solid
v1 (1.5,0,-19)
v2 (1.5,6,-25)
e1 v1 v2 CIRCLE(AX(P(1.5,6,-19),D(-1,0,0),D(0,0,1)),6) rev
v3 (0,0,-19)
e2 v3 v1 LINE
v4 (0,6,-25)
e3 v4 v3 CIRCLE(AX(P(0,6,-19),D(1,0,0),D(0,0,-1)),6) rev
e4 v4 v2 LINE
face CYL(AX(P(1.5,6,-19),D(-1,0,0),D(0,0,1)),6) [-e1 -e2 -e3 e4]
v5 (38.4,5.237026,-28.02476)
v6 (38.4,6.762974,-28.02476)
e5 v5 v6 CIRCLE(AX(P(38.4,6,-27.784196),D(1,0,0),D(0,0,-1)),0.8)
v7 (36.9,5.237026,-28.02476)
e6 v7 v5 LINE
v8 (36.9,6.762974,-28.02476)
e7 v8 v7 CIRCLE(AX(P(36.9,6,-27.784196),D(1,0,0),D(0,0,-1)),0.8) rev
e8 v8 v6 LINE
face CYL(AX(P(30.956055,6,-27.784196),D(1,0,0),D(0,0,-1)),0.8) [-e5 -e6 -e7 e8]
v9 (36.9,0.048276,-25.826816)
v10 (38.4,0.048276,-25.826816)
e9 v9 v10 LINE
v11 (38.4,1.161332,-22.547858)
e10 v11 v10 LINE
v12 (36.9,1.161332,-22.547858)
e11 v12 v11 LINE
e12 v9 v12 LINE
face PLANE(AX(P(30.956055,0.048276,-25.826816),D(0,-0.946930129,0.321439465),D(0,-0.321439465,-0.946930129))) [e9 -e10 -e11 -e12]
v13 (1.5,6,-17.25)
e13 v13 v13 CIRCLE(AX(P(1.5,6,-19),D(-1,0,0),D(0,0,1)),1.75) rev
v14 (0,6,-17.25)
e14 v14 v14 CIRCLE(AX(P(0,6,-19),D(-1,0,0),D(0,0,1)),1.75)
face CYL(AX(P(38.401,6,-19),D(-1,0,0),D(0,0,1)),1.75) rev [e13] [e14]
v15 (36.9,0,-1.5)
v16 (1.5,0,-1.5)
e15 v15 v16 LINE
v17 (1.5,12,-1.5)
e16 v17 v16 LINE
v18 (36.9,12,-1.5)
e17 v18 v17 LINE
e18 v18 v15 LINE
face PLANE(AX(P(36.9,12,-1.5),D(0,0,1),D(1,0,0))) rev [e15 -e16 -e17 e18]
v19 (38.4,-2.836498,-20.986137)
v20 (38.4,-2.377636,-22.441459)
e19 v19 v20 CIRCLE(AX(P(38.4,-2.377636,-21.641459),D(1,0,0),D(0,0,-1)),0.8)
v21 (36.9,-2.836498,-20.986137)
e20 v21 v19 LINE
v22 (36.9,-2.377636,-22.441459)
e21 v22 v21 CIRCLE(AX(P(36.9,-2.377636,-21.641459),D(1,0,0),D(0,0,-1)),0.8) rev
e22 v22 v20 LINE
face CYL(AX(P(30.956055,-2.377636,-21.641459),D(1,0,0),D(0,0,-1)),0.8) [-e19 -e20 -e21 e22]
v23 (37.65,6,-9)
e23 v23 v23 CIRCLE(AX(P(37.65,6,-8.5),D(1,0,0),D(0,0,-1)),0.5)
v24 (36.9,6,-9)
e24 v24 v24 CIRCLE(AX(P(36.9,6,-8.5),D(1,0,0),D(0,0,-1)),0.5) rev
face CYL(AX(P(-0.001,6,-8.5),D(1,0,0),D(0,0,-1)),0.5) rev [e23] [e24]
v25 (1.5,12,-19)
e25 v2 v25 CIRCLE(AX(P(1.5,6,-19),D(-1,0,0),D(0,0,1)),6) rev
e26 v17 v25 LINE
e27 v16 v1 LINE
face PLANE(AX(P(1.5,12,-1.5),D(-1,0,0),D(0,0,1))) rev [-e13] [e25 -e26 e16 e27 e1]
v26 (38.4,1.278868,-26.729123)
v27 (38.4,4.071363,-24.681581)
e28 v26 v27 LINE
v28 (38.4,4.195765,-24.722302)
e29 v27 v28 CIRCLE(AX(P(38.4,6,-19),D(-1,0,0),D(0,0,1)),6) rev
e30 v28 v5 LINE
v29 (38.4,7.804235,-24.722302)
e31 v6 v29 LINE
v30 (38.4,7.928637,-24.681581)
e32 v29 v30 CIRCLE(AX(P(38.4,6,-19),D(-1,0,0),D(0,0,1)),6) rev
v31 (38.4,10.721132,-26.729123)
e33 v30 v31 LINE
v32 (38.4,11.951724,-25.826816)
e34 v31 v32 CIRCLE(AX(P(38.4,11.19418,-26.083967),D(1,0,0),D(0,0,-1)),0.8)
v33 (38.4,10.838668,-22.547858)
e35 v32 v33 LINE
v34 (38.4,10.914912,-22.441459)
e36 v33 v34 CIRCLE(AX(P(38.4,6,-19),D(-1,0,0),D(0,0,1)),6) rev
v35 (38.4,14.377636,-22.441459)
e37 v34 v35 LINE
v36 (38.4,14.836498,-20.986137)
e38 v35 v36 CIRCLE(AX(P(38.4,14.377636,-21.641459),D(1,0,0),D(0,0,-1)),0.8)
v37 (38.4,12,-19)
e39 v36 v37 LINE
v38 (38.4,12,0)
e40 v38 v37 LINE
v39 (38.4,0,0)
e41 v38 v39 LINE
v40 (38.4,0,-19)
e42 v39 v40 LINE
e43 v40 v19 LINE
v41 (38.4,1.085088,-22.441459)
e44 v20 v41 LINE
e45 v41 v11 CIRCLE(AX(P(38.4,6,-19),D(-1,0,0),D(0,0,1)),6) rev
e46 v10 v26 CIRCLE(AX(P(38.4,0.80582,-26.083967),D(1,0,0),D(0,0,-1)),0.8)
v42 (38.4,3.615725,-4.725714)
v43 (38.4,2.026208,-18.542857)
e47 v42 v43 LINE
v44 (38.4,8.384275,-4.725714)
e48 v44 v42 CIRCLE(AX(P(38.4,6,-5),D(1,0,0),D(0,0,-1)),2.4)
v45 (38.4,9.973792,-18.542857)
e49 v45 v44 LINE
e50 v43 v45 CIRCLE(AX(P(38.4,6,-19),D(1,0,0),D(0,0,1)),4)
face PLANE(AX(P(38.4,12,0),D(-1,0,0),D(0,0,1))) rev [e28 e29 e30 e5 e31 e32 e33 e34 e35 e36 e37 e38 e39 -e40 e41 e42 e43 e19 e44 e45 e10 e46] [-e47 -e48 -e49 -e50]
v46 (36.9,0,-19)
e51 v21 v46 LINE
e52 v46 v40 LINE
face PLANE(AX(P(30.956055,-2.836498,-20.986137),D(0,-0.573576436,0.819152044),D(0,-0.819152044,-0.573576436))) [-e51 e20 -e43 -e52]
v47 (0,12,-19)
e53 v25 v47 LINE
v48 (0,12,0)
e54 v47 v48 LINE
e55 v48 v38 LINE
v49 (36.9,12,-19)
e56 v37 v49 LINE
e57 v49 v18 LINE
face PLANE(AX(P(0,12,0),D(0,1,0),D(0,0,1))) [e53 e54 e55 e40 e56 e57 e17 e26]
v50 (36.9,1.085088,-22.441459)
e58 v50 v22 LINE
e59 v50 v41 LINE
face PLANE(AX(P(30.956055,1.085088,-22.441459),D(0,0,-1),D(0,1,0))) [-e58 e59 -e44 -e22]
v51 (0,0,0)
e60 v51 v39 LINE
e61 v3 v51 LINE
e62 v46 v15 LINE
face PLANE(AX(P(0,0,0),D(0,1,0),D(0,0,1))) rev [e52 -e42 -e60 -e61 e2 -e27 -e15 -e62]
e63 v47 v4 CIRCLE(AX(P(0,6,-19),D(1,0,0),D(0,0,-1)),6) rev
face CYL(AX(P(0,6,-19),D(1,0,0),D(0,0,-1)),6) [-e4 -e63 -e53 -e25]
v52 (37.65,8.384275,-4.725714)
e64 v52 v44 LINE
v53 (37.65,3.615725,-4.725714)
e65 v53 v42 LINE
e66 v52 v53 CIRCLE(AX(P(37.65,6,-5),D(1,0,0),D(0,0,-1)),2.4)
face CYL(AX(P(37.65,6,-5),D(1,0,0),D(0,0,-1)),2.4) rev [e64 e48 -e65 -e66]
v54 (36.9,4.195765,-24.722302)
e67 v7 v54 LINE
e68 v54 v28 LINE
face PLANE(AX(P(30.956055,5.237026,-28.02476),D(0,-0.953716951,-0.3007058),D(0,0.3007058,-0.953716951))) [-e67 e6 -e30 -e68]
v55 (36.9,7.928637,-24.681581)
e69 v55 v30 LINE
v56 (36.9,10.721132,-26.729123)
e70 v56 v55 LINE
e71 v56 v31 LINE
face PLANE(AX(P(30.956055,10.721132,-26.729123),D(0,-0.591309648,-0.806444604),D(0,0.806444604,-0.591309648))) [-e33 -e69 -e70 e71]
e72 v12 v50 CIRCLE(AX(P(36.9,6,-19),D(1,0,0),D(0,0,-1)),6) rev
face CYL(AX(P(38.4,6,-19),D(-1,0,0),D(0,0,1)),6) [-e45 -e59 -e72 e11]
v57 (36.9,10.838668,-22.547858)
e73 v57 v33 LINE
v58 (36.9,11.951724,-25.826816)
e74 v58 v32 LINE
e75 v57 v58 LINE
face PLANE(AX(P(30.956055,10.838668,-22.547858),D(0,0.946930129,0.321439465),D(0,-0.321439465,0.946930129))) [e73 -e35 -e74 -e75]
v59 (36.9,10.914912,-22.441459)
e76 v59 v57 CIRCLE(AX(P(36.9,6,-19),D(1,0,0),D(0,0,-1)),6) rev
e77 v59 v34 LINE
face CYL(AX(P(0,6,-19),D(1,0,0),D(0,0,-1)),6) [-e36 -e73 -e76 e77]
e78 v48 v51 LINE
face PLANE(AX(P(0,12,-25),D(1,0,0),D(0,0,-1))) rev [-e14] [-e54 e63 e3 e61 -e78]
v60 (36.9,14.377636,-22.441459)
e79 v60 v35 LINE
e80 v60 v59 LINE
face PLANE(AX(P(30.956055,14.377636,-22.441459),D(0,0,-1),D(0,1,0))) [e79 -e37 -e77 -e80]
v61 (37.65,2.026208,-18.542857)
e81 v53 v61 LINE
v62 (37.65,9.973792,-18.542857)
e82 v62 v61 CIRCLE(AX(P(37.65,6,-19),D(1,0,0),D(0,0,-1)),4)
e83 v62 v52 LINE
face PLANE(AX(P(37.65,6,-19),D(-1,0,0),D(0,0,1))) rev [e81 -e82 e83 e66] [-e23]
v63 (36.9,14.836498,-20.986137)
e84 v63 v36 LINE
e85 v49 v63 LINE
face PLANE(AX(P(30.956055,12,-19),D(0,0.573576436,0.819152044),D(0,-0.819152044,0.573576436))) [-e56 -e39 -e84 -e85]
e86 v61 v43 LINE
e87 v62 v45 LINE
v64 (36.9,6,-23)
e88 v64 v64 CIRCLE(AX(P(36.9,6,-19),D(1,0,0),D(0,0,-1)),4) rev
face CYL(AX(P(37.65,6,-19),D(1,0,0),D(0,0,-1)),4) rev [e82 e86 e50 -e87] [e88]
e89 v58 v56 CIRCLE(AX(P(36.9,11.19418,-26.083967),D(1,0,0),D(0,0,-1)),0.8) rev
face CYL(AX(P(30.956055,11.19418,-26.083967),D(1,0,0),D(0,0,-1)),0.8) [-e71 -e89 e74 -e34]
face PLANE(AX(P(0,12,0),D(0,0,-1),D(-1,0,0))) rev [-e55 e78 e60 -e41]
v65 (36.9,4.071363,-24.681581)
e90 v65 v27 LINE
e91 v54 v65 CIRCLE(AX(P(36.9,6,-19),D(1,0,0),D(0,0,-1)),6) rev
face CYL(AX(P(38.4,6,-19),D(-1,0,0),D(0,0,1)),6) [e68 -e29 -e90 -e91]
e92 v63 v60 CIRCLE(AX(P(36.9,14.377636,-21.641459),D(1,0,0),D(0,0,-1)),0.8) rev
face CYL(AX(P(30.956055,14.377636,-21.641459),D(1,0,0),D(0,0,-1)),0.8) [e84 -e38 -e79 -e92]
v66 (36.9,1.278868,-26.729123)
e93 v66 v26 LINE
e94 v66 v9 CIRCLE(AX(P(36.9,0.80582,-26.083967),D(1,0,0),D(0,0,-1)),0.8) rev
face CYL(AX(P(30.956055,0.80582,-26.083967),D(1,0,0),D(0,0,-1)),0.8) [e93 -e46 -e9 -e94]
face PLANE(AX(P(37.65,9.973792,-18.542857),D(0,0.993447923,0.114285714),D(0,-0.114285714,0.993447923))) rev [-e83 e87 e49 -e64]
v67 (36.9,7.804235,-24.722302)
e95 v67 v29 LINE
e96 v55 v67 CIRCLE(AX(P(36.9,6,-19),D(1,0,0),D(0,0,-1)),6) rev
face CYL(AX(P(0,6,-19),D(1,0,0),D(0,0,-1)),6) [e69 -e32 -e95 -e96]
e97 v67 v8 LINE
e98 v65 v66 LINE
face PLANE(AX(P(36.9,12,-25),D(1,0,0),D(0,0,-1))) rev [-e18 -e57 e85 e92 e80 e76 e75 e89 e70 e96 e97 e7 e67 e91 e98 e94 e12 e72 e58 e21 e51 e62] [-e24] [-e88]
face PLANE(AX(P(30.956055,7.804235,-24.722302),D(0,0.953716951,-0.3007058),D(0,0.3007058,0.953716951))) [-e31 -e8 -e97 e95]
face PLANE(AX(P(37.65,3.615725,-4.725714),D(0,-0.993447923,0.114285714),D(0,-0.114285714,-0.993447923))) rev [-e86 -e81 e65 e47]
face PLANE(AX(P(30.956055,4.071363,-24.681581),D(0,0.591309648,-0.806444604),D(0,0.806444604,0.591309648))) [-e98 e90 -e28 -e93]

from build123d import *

# Parameters (mm, degrees)
EXTRUDE_2_DEPTH     = 12
FILLET_1_R          = 6
CUT_EXTRUDE_1_DEPTH = 0.75
CUT_EXTRUDE_2_REACH = 48.76
SKETCH_4_R          = 4
CUT_EXTRUDE_3_REACH = 49.366
SKETCH_5_R          = 1.75
CUT_EXTRUDE_4_REACH = 48.76
SKETCH_6_R          = 0.5
EXTRUDE_4_DEPTH     = 1.5


with BuildPart() as part:
    # 草图2 → 凸台-拉伸2 (new body)
    with BuildSketch(Plane(origin=(0, 0, 0), x_dir=(1, 0, 0), z_dir=(0, 1, 0))):
        Polygon((0, 0), (38.4, 0), (38.4, 25), (36.9, 25), (36.9, 1.5), (1.5, 1.5), (1.5, 25), (0, 25), align=None)
    extrude(amount=EXTRUDE_2_DEPTH)

    # 圆角1
    fillet_1_edges = [part.edges().sort_by_distance(p)[0] for p in [
        (0.75, 0, -25),
        (0.75, 12, -25),
        (37.65, 0, -25),
        (37.65, 12, -25),
    ]]
    fillet(fillet_1_edges, radius=FILLET_1_R - 0.0001)  # a hair under: the kernel refuses the full size

    # 草图3 → 切除-拉伸1 (cut)
    with BuildSketch(Plane(origin=(38.4, 0, 0), x_dir=(0, 0, -1), z_dir=(1, 0, 0))):
        with BuildLine():
            Line((18.542857143, 9.973791692), (4.725714286, 8.384275015))
            ThreePointArc((4.725714286, 8.384275015), (2.6, 6), (4.725714286, 3.615724985))
            Line((4.725714286, 3.615724985), (18.542857143, 2.026208308))
            ThreePointArc((18.542857143, 2.026208308), (23, 6), (18.542857143, 9.973791692))
        make_face()
    extrude(amount=-CUT_EXTRUDE_1_DEPTH, mode=Mode.SUBTRACT)

    # 草图4 → 切除-拉伸2 (cut, up to next)
    with BuildSketch(Plane(origin=(37.65, 0, 0), x_dir=(0, 0, -1), z_dir=(1, 0, 0)), mode=Mode.PRIVATE) as cut_extrude_2_sk1:
        with Locations((19, 6)):
            Circle(SKETCH_4_R)
    cut_extrude_2_tool1 = extrude(cut_extrude_2_sk1.sketch, amount=-CUT_EXTRUDE_2_REACH, mode=Mode.PRIVATE) & part.part
    add(cut_extrude_2_tool1.solids().sort_by_distance((37.65, 6, -19))[0], mode=Mode.SUBTRACT)

    # 草图5 → 切除-拉伸3 (cut, up to next)
    with BuildSketch(Plane.ZY, mode=Mode.PRIVATE) as cut_extrude_3_sk1:
        with Locations((-19, 6)):
            Circle(SKETCH_5_R)
    cut_extrude_3_tool1 = extrude(cut_extrude_3_sk1.sketch, amount=-CUT_EXTRUDE_3_REACH, mode=Mode.PRIVATE) & part.part
    add(cut_extrude_3_tool1.solids().sort_by_distance((0, 6, -19))[0], mode=Mode.SUBTRACT)

    # 草图6 → 切除-拉伸4 (cut, up to next)
    with BuildSketch(Plane(origin=(37.65, 0, 0), x_dir=(0, 0, -1), z_dir=(1, 0, 0)), mode=Mode.PRIVATE) as cut_extrude_4_sk1:
        with Locations((8.5, 6)):
            Circle(SKETCH_6_R)
    cut_extrude_4_tool1 = extrude(cut_extrude_4_sk1.sketch, amount=-CUT_EXTRUDE_4_REACH, mode=Mode.PRIVATE) & part.part
    add(cut_extrude_4_tool1.solids().sort_by_distance((37.65, 6, -8.5))[0], mode=Mode.SUBTRACT)

    # 草图7 → 凸台-拉伸4 (add)
    with BuildSketch(Plane(origin=(38.4, 0, 0), x_dir=(0, 0, -1), z_dir=(1, 0, 0))):
        with BuildLine():
            Line((19, 12), (20.986136983, 14.836497573))
            ThreePointArc((20.986136983, 14.836497573), (21.882023258, 15.140609984), (22.441458618, 14.377636424))
            Line((22.441458618, 14.377636424), (22.441458618, 10.914912266))
            ThreePointArc((22.441458618, 10.914912266), (20.804234797, 11.722301704), (19, 12))
        make_face()
        with BuildLine():
            Line((26.729122981, 10.721132005), (24.681580777, 7.928636792))
            ThreePointArc((24.681580777, 7.928636792), (23.838667626, 9.54785789), (22.54785789, 10.838667626))
            Line((22.54785789, 10.838667626), (25.826815726, 11.951723827))
            ThreePointArc((25.826815726, 11.951723827), (26.729122981, 11.667227443), (26.729122981, 10.721132005))
        make_face()
        with BuildLine():
            Line((28.02476043, 5.237026439), (24.722301704, 4.195765203))
            ThreePointArc((24.722301704, 4.195765203), (25, 6), (24.722301704, 7.804234797))
            Line((24.722301704, 7.804234797), (28.02476043, 6.762973561))
            ThreePointArc((28.02476043, 6.762973561), (28.58419579, 6), (28.02476043, 5.237026439))
        make_face()
        with BuildLine():
            Line((25.826815726, 0.048276173), (22.54785789, 1.161332374))
            ThreePointArc((22.54785789, 1.161332374), (23.838667626, 2.45214211), (24.681580777, 4.071363208))
            Line((24.681580777, 4.071363208), (26.729122981, 1.278867995))
            ThreePointArc((26.729122981, 1.278867995), (26.729122981, 0.332772557), (25.826815726, 0.048276173))
        make_face()
        with BuildLine():
            Line((20.986136983, -2.836497573), (19, 0))
            ThreePointArc((19, 0), (20.804234797, 0.277698296), (22.441458618, 1.085087734))
            Line((22.441458618, 1.085087734), (22.441458618, -2.377636424))
            ThreePointArc((22.441458618, -2.377636424), (21.882023258, -3.140609984), (20.986136983, -2.836497573))
        make_face()
    extrude(amount=-EXTRUDE_4_DEPTH)


solid = part.part
